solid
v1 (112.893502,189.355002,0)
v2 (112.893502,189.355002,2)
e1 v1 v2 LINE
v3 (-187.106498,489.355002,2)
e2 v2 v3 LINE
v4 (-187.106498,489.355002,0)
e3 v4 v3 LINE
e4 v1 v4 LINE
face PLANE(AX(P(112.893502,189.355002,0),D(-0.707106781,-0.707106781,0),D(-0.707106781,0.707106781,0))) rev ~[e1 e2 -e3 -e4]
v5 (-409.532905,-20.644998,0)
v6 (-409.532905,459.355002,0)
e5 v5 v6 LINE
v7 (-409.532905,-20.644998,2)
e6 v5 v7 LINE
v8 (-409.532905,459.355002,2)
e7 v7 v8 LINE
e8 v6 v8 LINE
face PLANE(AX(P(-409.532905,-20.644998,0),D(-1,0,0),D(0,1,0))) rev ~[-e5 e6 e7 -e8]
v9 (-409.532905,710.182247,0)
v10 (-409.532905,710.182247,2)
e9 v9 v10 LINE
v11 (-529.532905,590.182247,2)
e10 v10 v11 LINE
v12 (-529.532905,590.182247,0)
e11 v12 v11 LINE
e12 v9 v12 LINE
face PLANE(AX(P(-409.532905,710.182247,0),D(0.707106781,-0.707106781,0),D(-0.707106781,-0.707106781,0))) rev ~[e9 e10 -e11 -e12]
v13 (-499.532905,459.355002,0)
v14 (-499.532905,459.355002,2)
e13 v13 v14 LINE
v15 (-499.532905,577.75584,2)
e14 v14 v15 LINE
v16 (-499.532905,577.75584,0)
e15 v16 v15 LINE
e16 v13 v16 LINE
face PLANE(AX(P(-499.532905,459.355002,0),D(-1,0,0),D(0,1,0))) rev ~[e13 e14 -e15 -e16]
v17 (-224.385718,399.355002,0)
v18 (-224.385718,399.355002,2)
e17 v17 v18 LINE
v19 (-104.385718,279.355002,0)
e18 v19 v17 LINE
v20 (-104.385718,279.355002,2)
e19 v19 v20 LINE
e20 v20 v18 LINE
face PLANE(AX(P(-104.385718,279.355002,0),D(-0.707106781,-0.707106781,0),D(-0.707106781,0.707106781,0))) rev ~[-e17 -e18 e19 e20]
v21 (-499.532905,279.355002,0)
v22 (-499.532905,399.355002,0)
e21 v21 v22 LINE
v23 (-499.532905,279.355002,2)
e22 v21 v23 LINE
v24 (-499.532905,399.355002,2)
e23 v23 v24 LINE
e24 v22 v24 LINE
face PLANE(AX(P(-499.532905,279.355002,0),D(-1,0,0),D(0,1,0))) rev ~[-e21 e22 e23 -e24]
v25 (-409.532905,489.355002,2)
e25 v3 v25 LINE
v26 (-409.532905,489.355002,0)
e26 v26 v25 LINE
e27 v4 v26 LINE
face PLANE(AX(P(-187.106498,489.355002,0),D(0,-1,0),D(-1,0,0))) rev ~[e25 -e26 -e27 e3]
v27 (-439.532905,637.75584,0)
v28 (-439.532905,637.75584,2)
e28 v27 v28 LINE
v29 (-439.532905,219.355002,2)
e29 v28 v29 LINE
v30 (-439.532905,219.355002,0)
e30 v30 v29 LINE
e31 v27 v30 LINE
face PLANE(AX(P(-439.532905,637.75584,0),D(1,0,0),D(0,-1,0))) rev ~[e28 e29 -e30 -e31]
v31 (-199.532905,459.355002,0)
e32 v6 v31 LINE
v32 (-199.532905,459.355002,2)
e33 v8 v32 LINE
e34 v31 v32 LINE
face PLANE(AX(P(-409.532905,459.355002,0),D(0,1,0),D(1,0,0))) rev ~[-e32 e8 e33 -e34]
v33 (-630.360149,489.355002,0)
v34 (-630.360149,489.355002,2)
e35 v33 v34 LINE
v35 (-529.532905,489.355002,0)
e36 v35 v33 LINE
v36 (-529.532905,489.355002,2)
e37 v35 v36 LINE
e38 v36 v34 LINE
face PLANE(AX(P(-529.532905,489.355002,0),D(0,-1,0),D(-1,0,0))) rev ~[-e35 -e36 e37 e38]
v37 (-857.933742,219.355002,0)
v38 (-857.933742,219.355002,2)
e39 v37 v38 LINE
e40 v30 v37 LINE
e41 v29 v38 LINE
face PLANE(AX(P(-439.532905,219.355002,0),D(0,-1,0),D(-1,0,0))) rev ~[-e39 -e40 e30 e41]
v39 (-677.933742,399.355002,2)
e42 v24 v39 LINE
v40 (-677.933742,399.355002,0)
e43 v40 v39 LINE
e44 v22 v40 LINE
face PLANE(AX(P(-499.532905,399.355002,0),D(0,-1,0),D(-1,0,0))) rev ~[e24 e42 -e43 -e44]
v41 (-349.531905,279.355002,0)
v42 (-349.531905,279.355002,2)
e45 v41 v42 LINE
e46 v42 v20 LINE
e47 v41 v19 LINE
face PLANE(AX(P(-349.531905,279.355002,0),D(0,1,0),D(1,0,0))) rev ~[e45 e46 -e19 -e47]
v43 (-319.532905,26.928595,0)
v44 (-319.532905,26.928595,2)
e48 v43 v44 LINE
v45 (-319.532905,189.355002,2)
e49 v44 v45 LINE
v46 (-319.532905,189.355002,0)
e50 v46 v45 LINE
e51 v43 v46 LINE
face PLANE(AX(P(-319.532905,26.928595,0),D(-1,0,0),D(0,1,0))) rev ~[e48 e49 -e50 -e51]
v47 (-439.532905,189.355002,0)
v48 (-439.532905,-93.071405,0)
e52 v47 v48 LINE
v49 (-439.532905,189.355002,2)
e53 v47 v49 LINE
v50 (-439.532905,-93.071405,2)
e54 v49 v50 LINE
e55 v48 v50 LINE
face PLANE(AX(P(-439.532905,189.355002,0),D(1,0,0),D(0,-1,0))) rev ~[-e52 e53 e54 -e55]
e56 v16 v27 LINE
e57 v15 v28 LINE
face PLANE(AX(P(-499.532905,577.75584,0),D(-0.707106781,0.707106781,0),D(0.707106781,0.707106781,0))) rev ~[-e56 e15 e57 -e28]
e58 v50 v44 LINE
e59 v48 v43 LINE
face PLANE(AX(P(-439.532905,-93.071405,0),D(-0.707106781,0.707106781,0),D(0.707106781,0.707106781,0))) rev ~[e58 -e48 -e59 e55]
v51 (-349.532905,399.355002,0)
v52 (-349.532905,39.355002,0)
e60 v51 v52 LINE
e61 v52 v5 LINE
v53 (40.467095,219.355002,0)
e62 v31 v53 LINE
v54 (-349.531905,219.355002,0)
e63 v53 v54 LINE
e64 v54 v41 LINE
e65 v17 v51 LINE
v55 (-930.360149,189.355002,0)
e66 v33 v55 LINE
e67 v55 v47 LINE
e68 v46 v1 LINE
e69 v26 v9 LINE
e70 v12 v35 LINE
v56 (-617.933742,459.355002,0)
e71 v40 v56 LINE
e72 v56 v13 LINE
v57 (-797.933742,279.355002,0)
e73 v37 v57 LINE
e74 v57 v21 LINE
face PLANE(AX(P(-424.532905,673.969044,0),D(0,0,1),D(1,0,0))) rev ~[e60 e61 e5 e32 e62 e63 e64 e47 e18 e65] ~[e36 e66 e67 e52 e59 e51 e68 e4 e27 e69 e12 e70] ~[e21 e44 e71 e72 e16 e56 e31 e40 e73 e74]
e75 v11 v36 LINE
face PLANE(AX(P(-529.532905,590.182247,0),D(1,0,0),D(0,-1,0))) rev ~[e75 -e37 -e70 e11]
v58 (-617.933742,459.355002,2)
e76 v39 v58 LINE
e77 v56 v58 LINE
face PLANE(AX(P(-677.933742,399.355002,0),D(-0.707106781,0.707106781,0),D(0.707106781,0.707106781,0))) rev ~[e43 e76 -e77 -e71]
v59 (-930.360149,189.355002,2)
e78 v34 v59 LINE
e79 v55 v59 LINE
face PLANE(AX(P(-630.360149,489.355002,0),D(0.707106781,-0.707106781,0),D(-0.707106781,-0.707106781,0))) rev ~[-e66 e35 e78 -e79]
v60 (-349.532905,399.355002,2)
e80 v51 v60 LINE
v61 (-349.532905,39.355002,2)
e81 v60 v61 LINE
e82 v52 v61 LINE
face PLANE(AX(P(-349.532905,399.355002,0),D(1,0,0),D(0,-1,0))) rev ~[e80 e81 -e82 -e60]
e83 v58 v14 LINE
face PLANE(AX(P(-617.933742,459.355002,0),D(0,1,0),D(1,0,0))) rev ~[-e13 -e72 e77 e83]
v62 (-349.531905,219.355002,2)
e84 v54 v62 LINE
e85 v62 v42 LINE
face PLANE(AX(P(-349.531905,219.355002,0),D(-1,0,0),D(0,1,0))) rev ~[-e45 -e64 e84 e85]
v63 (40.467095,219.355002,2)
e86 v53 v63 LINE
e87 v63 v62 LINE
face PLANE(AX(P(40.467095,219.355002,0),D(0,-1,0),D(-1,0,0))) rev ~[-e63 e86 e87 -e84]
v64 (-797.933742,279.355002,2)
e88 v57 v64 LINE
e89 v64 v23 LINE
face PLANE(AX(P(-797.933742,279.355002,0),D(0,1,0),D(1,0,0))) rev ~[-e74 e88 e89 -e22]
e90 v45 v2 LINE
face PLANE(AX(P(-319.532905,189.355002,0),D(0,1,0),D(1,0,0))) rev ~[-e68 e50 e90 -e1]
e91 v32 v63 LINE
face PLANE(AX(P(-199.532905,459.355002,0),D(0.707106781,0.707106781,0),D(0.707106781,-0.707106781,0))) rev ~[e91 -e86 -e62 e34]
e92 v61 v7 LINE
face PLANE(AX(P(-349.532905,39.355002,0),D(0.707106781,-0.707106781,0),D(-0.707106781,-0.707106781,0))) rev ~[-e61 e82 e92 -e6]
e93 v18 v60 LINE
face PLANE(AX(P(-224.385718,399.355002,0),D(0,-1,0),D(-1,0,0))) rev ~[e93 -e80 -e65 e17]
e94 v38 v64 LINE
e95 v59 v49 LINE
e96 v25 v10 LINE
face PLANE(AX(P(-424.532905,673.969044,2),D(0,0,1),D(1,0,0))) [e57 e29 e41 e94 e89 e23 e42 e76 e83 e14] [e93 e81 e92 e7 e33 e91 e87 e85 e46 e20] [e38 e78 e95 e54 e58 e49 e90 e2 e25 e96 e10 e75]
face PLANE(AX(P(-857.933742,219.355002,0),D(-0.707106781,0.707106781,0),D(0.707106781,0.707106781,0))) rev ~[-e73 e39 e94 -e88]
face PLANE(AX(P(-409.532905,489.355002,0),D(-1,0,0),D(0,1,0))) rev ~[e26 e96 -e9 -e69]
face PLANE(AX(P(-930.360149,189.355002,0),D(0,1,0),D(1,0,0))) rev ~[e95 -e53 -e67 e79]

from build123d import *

# Parameters (mm, degrees)
F0_W     = 0.001
F0_H     = 60
F1_DEPTH = 2


# Not quite as in the source:
# - a feature names something its author has since deleted; it is built from what else it names


with BuildPart() as f1:
    # F0 (on Top) → F1 (new body)
    with BuildSketch(Plane.XY):
        Polygon((-409.5329046249, 667.7558401073), (-409.5329046249, 703.2591700554), (-409.5329046249, 710.1822469785), (-439.5329046249, 680.1822469785), (-439.5329046249, 637.7558401073), align=None)
        Polygon((-409.5329046249, 489.3550023332), (-409.5329046249, 667.7558401073), (-439.5329046249, 637.7558401073), (-439.5329046249, 219.3550023332), (-439.5329046249, 189.3550023332), (-439.5329046249, -93.071404538), (-409.5329046249, -63.071404538), (-409.5329046249, -20.6449976668), (-409.5329046249, 189.3550023332), (-409.5329046249, 279.3550023332), (-409.5329046249, 399.3550023332), (-409.5329046249, 459.3550023332), align=None)
        Polygon((-187.1064977537, 489.3550023332), (-409.5329046249, 489.3550023332), (-409.5329046249, 459.3550023332), (-199.5329046249, 459.3550023332), (-157.1064977537, 459.3550023332), align=None)
        Polygon((-499.5329046249, 577.7558401073), (-439.5329046249, 637.7558401073), (-439.5329046249, 680.1822469785), (-499.5329046249, 620.1822469785), (-499.5329046249, 579.3550023332), align=None)
        Polygon((-439.5329046249, 189.3550023332), (-439.5329046249, 219.3550023332), (-857.933742399, 219.3550023332), (-887.933742399, 189.3550023332), align=None)
        Polygon((-529.5329046249, 547.7558401073), (-499.5329046249, 577.7558401073), (-499.5329046249, 579.3550023332), (-499.5329046249, 620.1822469785), (-529.5329046249, 590.1822469785), align=None)
        Polygon((-499.5329046249, 459.3550023332), (-499.5329046249, 577.7558401073), (-529.5329046249, 547.7558401073), (-529.5329046249, 489.3550023332), (-587.933742399, 489.3550023332), (-617.933742399, 459.3550023332), align=None)
        Polygon((-157.1064977537, 459.3550023332), (-199.5329046249, 459.3550023332), (-139.5329046249, 399.3550023332), (40.4670953751, 219.3550023332), (-44.3857183673, 219.3550023332), (-349.5319046249, 219.3550023332), (-349.5329046249, 219.3550023332), (-349.5329046249, 189.3550023332), (-319.5329046249, 189.3550023332), (112.8935022463, 189.3550023332), align=None)
        Polygon((-887.933742399, 189.3550023332), (-857.933742399, 219.3550023332), (-900.3601492702, 219.3550023332), (-930.3601492702, 189.3550023332), align=None)
        Polygon((-900.3601492702, 219.3550023332), (-857.933742399, 219.3550023332), (-797.933742399, 279.3550023332), (-840.3601492702, 279.3550023332), align=None)
        Polygon((-224.3857183673, 399.3550023332), (-349.5329046249, 399.3550023332), (-349.5329046249, 279.3550023332), (-349.5319046249, 279.3550023332), (-104.3857183673, 279.3550023332), align=None)
        Polygon((-677.933742399, 399.3550023332), (-797.933742399, 279.3550023332), (-499.5329046249, 279.3550023332), (-499.5329046249, 399.3550023332), align=None)
        Polygon((-840.3601492702, 279.3550023332), (-797.933742399, 279.3550023332), (-677.933742399, 399.3550023332), (-720.3601492702, 399.3550023332), align=None)
        Polygon((-677.933742399, 399.3550023332), (-617.933742399, 459.3550023332), (-660.3601492702, 459.3550023332), (-720.3601492702, 399.3550023332), align=None)
        Polygon((-660.3601492702, 459.3550023332), (-617.933742399, 459.3550023332), (-587.933742399, 489.3550023332), (-630.3601492702, 489.3550023332), align=None)
        with Locations((-349.5324046249, 249.3550023332)):
            Rectangle(F0_W, F0_H)
        Polygon((-319.5329046249, 26.928595462), (-319.5329046249, 189.3550023332), (-349.5329046249, 189.3550023332), (-349.5329046249, 39.3550023332), (-349.5329046249, -3.071404538), align=None)
        Polygon((-409.5329046249, -20.6449976668), (-409.5329046249, -63.071404538), (-349.5329046249, -3.071404538), (-349.5329046249, 39.3550023332), align=None)
    extrude(amount=F1_DEPTH)


solid = f1.part
